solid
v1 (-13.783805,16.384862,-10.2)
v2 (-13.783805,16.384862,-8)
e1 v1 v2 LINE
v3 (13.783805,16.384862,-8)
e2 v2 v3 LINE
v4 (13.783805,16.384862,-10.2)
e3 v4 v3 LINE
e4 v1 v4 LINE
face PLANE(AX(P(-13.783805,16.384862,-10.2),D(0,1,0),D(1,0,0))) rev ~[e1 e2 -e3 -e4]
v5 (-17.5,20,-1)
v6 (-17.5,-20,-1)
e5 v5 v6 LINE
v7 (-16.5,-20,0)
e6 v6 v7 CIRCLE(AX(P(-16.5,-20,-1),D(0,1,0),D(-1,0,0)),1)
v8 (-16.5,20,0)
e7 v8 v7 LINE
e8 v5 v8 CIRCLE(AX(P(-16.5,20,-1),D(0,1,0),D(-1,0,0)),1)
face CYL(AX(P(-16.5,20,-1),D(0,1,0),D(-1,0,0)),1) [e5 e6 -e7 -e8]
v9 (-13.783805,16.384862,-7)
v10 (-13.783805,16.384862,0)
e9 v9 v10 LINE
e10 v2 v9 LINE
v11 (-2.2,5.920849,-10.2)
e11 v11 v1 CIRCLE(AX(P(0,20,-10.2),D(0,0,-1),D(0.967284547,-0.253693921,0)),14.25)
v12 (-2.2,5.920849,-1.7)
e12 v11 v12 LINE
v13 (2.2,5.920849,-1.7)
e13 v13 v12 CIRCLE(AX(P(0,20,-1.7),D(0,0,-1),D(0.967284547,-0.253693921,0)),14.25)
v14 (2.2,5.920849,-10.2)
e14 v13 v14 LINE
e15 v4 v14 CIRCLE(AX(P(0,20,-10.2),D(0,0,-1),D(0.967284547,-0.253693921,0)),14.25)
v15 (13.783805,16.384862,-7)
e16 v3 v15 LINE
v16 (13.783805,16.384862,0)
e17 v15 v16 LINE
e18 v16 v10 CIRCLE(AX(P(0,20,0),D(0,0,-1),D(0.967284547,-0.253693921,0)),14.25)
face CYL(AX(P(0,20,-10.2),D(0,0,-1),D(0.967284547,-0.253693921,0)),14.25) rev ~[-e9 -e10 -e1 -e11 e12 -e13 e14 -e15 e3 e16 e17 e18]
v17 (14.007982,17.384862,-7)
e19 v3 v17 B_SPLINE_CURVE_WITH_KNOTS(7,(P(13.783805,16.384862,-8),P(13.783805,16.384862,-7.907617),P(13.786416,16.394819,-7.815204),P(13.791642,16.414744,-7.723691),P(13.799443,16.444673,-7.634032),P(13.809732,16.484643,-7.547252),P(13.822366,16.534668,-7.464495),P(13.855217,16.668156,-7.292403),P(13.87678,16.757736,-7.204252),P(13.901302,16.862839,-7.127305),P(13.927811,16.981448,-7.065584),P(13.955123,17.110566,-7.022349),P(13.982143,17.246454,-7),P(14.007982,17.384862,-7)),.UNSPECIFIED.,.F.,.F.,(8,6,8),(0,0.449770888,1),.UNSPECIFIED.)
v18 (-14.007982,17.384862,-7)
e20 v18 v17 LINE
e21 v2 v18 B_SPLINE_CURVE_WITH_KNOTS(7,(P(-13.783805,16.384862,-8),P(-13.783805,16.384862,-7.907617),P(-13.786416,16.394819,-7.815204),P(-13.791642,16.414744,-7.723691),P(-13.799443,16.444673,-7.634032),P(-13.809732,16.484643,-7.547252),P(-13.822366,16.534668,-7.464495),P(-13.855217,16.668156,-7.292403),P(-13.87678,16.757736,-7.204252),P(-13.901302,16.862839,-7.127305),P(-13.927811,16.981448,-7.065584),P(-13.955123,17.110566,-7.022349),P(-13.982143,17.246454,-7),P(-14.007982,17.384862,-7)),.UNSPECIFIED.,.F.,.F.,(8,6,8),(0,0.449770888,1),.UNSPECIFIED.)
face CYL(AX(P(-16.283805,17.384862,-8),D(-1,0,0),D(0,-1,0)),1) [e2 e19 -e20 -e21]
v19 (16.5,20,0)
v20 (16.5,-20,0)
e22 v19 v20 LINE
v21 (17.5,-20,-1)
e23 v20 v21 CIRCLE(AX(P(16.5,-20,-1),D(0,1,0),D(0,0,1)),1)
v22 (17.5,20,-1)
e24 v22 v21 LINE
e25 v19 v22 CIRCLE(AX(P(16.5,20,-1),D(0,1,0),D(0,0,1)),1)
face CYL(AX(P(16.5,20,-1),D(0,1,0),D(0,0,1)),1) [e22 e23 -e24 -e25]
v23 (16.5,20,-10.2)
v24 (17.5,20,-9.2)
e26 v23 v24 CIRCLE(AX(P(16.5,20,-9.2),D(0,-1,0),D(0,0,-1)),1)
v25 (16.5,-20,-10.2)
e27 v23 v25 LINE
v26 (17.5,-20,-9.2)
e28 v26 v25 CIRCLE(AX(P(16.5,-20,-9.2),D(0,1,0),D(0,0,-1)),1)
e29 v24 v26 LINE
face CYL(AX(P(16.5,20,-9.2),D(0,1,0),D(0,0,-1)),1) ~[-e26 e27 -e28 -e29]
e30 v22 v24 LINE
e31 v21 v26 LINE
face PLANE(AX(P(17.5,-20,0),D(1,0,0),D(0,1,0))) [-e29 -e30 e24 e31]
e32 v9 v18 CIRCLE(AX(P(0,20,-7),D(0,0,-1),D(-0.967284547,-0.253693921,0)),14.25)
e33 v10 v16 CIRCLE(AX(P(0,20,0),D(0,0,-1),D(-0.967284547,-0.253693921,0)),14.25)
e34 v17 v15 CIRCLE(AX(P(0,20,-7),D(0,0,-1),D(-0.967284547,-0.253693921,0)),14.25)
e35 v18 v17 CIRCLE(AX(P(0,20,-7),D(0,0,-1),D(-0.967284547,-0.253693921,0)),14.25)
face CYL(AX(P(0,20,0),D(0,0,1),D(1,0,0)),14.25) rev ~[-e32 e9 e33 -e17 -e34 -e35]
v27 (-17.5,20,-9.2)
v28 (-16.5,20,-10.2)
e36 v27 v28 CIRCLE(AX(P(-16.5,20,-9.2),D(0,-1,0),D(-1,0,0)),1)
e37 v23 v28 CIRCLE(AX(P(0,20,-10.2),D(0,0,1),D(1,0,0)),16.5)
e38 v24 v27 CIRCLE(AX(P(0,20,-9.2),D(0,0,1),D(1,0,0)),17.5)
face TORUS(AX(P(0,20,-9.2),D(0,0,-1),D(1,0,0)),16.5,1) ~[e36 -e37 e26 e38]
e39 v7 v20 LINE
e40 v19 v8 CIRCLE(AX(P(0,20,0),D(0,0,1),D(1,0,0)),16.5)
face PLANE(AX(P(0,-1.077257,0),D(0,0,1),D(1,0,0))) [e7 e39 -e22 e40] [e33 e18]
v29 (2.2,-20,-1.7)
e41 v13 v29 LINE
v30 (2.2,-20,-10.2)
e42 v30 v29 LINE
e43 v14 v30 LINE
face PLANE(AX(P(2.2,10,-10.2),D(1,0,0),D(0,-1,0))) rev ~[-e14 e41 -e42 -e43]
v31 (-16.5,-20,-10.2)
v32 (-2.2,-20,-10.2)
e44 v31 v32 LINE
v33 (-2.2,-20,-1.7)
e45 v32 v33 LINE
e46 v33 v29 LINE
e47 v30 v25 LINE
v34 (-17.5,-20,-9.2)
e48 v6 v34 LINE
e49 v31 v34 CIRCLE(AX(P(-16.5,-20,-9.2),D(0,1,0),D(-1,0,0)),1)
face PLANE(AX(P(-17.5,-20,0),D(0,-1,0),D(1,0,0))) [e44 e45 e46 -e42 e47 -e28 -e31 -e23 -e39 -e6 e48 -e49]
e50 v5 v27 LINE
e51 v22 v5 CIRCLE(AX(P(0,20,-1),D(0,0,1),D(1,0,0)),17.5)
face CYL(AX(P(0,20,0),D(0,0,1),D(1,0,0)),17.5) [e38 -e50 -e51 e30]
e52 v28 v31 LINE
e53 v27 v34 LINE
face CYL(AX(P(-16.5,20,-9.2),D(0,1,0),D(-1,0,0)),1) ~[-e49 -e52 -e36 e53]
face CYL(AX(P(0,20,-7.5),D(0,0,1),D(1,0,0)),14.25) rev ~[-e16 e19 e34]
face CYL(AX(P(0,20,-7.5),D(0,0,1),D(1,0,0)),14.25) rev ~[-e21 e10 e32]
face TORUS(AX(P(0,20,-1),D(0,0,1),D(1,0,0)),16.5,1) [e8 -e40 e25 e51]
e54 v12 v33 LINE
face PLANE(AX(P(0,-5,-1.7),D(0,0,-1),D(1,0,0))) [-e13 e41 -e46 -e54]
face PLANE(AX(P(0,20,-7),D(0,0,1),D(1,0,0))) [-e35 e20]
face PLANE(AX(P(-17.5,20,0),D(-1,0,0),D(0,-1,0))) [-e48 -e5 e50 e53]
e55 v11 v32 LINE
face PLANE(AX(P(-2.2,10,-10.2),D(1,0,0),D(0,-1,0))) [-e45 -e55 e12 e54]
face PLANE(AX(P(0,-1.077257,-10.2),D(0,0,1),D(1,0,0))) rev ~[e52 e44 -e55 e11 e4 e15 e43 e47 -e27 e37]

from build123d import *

# Parameters (mm, degrees)
F1_DEPTH     = 10.2
F2_R         = 14.25
F3_DEPTH     = 7
F4_W         = 4.4
F4_H         = 30
F5_DEPTH     = 8.5
F7_DEPTH     = 25
F9_T1_DEPTH  = 42.5
F9_T4_ANGLE  = 180
F9_T6_ANGLE  = 180
F9_T10_DEPTH = 32.5676095837
F9_S11_R     = 14.25
F9_T12_DEPTH = 18


# Not quite as in the source:
# - a fillet or chamfer that OpenCascade refuses, or shapes differently, is made with other operations: its cross-section is extruded or revolved along the edge and cut away or added


with BuildPart() as f1:
    # F0 (on Top) → F1 (new body)
    with BuildSketch(Plane.XY):
        with BuildLine():
            Line((-17.5, 20), (-17.5, -20))
            Line((-17.5, -20), (17.5, -20))
            Line((17.5, -20), (17.5, 20))
            ThreePointArc((17.5, 20), (0, 2.5), (-17.5, 20))
        make_face()
        with BuildLine():
            Line((17.5, 20), (-17.5, 20))
            ThreePointArc((-17.5, 20), (0, 2.5), (17.5, 20))
        make_face()
        with BuildLine():
            ThreePointArc((17.5, 20), (0, 37.5), (-17.5, 20))
            Line((-17.5, 20), (17.5, 20))
        make_face()
    extrude(amount=-F1_DEPTH)


with BuildPart() as f3:
    # F2 (on Top) → F3 (new body)
    with BuildSketch(Plane.XY):
        with Locations((0, 20)):
            Circle(F2_R)
    extrude(amount=-F3_DEPTH)


with BuildPart() as f5:
    # F4 (on face) → F5 (new body)
    with BuildSketch(Plane(origin=(0, 0, -10.2), x_dir=(1, 0, 0), z_dir=(0, 0, -1))):
        with Locations((0, 5)):
            Rectangle(F4_W, F4_H)
    extrude(amount=-F5_DEPTH)


with BuildPart() as f7:
    # F6 (on face) → F7 (new body)
    with BuildSketch(Plane(origin=(0, 0, -10.2), x_dir=(1, 0, 0), z_dir=(0, 0, -1))):
        with BuildLine():
            Line((-13.7838047919, -16.3848616264), (13.7838047919, -16.3848616264))
            ThreePointArc((13.7838047919, -16.3848616264), (0, -5.75), (-13.7838047919, -16.3848616264))
        make_face()
    extrude(amount=-F7_DEPTH)


with BuildPart() as f1_1:
    add(f1.part)

    # F8: cut F7, F5, F3
    add(f7.part, mode=Mode.SUBTRACT)
    add(f5.part, mode=Mode.SUBTRACT)
    add(f3.part, mode=Mode.SUBTRACT)

    # F9: fillet of radius 1 on 3 edges, made by hand

    # F9_s2 → F9_t1 (cut)
    with BuildSketch(Plane.XZ.offset(-20)):
        with BuildLine():
            ThreePointArc((16.5, -10.2), (17.2071067812, -9.9071067812), (17.5, -9.2))
            Line((17.5, -9.2), (17.5, -10.2))
            Line((17.5, -10.2), (16.5, -10.2))
        make_face()
        with BuildLine():
            ThreePointArc((-17.5, -9.2), (-17.2071067812, -9.9071067812), (-16.5, -10.2))
            Line((-16.5, -10.2), (-17.5, -10.2))
            Line((-17.5, -10.2), (-17.5, -9.2))
        make_face()
        with BuildLine():
            ThreePointArc((16.5, 0), (17.2071067812, -0.2928932188), (17.5, -1))
            Line((17.5, -1), (17.5, 0))
            Line((17.5, 0), (16.5, 0))
        make_face()
        with BuildLine():
            ThreePointArc((-17.5, -1), (-17.2071067812, -0.2928932188), (-16.5, 0))
            Line((-16.5, 0), (-17.5, 0))
            Line((-17.5, 0), (-17.5, -1))
        make_face()
    extrude(amount=F9_T1_DEPTH, mode=Mode.SUBTRACT)

    # F9_s3 → F9_t4 (revolve, cut)
    with BuildSketch(Plane.XZ.offset(-20)):
        with BuildLine():
            ThreePointArc((17.5, -1), (17.2071067812, -0.2928932188), (16.5, 0))
            Line((16.5, 0), (17.5, 0))
            Line((17.5, 0), (17.5, -1))
        make_face()
    revolve(axis=Axis((0, 20, 0), (0, 0, 1)), revolution_arc=F9_T4_ANGLE, mode=Mode.SUBTRACT)

    # F9_s5 → F9_t6 (revolve, cut)
    with BuildSketch(Plane.XZ.offset(-20)):
        with BuildLine():
            ThreePointArc((17.5, -9.2), (17.2071067812, -9.9071067812), (16.5, -10.2))
            Line((16.5, -10.2), (17.5, -10.2))
            Line((17.5, -10.2), (17.5, -9.2))
        make_face()
    revolve(axis=Axis((0, 20, -10.2), (0, 0, 1)), revolution_arc=F9_T6_ANGLE, mode=Mode.SUBTRACT)


with BuildPart() as f9_tool8:
    # F9_s9 → F9_t10 (new body)
    with BuildSketch(Plane.YZ.offset(-16.2838047919)):
        with BuildLine():
            ThreePointArc((16.3848616264, -8), (16.6777548452, -7.2928932188), (17.3848616264, -7))
            Line((17.3848616264, -7), (16.3848616264, -7))
            Line((16.3848616264, -7), (16.3848616264, -8))
        make_face()
    extrude(amount=F9_T10_DEPTH)

    # F9_s11 → F9_t12 (intersect, symmetric)
    with BuildSketch(Plane.XY.offset(-7.5)):
        with Locations((0, 20)):
            Circle(F9_S11_R)
    extrude(amount=F9_T12_DEPTH, both=True, mode=Mode.INTERSECT)


with BuildPart() as f1_2:
    add(f1_1.part)

    # F9_t7: cut F9_tool8
    add(f9_tool8.part, mode=Mode.SUBTRACT)


solid = f1_2.part
